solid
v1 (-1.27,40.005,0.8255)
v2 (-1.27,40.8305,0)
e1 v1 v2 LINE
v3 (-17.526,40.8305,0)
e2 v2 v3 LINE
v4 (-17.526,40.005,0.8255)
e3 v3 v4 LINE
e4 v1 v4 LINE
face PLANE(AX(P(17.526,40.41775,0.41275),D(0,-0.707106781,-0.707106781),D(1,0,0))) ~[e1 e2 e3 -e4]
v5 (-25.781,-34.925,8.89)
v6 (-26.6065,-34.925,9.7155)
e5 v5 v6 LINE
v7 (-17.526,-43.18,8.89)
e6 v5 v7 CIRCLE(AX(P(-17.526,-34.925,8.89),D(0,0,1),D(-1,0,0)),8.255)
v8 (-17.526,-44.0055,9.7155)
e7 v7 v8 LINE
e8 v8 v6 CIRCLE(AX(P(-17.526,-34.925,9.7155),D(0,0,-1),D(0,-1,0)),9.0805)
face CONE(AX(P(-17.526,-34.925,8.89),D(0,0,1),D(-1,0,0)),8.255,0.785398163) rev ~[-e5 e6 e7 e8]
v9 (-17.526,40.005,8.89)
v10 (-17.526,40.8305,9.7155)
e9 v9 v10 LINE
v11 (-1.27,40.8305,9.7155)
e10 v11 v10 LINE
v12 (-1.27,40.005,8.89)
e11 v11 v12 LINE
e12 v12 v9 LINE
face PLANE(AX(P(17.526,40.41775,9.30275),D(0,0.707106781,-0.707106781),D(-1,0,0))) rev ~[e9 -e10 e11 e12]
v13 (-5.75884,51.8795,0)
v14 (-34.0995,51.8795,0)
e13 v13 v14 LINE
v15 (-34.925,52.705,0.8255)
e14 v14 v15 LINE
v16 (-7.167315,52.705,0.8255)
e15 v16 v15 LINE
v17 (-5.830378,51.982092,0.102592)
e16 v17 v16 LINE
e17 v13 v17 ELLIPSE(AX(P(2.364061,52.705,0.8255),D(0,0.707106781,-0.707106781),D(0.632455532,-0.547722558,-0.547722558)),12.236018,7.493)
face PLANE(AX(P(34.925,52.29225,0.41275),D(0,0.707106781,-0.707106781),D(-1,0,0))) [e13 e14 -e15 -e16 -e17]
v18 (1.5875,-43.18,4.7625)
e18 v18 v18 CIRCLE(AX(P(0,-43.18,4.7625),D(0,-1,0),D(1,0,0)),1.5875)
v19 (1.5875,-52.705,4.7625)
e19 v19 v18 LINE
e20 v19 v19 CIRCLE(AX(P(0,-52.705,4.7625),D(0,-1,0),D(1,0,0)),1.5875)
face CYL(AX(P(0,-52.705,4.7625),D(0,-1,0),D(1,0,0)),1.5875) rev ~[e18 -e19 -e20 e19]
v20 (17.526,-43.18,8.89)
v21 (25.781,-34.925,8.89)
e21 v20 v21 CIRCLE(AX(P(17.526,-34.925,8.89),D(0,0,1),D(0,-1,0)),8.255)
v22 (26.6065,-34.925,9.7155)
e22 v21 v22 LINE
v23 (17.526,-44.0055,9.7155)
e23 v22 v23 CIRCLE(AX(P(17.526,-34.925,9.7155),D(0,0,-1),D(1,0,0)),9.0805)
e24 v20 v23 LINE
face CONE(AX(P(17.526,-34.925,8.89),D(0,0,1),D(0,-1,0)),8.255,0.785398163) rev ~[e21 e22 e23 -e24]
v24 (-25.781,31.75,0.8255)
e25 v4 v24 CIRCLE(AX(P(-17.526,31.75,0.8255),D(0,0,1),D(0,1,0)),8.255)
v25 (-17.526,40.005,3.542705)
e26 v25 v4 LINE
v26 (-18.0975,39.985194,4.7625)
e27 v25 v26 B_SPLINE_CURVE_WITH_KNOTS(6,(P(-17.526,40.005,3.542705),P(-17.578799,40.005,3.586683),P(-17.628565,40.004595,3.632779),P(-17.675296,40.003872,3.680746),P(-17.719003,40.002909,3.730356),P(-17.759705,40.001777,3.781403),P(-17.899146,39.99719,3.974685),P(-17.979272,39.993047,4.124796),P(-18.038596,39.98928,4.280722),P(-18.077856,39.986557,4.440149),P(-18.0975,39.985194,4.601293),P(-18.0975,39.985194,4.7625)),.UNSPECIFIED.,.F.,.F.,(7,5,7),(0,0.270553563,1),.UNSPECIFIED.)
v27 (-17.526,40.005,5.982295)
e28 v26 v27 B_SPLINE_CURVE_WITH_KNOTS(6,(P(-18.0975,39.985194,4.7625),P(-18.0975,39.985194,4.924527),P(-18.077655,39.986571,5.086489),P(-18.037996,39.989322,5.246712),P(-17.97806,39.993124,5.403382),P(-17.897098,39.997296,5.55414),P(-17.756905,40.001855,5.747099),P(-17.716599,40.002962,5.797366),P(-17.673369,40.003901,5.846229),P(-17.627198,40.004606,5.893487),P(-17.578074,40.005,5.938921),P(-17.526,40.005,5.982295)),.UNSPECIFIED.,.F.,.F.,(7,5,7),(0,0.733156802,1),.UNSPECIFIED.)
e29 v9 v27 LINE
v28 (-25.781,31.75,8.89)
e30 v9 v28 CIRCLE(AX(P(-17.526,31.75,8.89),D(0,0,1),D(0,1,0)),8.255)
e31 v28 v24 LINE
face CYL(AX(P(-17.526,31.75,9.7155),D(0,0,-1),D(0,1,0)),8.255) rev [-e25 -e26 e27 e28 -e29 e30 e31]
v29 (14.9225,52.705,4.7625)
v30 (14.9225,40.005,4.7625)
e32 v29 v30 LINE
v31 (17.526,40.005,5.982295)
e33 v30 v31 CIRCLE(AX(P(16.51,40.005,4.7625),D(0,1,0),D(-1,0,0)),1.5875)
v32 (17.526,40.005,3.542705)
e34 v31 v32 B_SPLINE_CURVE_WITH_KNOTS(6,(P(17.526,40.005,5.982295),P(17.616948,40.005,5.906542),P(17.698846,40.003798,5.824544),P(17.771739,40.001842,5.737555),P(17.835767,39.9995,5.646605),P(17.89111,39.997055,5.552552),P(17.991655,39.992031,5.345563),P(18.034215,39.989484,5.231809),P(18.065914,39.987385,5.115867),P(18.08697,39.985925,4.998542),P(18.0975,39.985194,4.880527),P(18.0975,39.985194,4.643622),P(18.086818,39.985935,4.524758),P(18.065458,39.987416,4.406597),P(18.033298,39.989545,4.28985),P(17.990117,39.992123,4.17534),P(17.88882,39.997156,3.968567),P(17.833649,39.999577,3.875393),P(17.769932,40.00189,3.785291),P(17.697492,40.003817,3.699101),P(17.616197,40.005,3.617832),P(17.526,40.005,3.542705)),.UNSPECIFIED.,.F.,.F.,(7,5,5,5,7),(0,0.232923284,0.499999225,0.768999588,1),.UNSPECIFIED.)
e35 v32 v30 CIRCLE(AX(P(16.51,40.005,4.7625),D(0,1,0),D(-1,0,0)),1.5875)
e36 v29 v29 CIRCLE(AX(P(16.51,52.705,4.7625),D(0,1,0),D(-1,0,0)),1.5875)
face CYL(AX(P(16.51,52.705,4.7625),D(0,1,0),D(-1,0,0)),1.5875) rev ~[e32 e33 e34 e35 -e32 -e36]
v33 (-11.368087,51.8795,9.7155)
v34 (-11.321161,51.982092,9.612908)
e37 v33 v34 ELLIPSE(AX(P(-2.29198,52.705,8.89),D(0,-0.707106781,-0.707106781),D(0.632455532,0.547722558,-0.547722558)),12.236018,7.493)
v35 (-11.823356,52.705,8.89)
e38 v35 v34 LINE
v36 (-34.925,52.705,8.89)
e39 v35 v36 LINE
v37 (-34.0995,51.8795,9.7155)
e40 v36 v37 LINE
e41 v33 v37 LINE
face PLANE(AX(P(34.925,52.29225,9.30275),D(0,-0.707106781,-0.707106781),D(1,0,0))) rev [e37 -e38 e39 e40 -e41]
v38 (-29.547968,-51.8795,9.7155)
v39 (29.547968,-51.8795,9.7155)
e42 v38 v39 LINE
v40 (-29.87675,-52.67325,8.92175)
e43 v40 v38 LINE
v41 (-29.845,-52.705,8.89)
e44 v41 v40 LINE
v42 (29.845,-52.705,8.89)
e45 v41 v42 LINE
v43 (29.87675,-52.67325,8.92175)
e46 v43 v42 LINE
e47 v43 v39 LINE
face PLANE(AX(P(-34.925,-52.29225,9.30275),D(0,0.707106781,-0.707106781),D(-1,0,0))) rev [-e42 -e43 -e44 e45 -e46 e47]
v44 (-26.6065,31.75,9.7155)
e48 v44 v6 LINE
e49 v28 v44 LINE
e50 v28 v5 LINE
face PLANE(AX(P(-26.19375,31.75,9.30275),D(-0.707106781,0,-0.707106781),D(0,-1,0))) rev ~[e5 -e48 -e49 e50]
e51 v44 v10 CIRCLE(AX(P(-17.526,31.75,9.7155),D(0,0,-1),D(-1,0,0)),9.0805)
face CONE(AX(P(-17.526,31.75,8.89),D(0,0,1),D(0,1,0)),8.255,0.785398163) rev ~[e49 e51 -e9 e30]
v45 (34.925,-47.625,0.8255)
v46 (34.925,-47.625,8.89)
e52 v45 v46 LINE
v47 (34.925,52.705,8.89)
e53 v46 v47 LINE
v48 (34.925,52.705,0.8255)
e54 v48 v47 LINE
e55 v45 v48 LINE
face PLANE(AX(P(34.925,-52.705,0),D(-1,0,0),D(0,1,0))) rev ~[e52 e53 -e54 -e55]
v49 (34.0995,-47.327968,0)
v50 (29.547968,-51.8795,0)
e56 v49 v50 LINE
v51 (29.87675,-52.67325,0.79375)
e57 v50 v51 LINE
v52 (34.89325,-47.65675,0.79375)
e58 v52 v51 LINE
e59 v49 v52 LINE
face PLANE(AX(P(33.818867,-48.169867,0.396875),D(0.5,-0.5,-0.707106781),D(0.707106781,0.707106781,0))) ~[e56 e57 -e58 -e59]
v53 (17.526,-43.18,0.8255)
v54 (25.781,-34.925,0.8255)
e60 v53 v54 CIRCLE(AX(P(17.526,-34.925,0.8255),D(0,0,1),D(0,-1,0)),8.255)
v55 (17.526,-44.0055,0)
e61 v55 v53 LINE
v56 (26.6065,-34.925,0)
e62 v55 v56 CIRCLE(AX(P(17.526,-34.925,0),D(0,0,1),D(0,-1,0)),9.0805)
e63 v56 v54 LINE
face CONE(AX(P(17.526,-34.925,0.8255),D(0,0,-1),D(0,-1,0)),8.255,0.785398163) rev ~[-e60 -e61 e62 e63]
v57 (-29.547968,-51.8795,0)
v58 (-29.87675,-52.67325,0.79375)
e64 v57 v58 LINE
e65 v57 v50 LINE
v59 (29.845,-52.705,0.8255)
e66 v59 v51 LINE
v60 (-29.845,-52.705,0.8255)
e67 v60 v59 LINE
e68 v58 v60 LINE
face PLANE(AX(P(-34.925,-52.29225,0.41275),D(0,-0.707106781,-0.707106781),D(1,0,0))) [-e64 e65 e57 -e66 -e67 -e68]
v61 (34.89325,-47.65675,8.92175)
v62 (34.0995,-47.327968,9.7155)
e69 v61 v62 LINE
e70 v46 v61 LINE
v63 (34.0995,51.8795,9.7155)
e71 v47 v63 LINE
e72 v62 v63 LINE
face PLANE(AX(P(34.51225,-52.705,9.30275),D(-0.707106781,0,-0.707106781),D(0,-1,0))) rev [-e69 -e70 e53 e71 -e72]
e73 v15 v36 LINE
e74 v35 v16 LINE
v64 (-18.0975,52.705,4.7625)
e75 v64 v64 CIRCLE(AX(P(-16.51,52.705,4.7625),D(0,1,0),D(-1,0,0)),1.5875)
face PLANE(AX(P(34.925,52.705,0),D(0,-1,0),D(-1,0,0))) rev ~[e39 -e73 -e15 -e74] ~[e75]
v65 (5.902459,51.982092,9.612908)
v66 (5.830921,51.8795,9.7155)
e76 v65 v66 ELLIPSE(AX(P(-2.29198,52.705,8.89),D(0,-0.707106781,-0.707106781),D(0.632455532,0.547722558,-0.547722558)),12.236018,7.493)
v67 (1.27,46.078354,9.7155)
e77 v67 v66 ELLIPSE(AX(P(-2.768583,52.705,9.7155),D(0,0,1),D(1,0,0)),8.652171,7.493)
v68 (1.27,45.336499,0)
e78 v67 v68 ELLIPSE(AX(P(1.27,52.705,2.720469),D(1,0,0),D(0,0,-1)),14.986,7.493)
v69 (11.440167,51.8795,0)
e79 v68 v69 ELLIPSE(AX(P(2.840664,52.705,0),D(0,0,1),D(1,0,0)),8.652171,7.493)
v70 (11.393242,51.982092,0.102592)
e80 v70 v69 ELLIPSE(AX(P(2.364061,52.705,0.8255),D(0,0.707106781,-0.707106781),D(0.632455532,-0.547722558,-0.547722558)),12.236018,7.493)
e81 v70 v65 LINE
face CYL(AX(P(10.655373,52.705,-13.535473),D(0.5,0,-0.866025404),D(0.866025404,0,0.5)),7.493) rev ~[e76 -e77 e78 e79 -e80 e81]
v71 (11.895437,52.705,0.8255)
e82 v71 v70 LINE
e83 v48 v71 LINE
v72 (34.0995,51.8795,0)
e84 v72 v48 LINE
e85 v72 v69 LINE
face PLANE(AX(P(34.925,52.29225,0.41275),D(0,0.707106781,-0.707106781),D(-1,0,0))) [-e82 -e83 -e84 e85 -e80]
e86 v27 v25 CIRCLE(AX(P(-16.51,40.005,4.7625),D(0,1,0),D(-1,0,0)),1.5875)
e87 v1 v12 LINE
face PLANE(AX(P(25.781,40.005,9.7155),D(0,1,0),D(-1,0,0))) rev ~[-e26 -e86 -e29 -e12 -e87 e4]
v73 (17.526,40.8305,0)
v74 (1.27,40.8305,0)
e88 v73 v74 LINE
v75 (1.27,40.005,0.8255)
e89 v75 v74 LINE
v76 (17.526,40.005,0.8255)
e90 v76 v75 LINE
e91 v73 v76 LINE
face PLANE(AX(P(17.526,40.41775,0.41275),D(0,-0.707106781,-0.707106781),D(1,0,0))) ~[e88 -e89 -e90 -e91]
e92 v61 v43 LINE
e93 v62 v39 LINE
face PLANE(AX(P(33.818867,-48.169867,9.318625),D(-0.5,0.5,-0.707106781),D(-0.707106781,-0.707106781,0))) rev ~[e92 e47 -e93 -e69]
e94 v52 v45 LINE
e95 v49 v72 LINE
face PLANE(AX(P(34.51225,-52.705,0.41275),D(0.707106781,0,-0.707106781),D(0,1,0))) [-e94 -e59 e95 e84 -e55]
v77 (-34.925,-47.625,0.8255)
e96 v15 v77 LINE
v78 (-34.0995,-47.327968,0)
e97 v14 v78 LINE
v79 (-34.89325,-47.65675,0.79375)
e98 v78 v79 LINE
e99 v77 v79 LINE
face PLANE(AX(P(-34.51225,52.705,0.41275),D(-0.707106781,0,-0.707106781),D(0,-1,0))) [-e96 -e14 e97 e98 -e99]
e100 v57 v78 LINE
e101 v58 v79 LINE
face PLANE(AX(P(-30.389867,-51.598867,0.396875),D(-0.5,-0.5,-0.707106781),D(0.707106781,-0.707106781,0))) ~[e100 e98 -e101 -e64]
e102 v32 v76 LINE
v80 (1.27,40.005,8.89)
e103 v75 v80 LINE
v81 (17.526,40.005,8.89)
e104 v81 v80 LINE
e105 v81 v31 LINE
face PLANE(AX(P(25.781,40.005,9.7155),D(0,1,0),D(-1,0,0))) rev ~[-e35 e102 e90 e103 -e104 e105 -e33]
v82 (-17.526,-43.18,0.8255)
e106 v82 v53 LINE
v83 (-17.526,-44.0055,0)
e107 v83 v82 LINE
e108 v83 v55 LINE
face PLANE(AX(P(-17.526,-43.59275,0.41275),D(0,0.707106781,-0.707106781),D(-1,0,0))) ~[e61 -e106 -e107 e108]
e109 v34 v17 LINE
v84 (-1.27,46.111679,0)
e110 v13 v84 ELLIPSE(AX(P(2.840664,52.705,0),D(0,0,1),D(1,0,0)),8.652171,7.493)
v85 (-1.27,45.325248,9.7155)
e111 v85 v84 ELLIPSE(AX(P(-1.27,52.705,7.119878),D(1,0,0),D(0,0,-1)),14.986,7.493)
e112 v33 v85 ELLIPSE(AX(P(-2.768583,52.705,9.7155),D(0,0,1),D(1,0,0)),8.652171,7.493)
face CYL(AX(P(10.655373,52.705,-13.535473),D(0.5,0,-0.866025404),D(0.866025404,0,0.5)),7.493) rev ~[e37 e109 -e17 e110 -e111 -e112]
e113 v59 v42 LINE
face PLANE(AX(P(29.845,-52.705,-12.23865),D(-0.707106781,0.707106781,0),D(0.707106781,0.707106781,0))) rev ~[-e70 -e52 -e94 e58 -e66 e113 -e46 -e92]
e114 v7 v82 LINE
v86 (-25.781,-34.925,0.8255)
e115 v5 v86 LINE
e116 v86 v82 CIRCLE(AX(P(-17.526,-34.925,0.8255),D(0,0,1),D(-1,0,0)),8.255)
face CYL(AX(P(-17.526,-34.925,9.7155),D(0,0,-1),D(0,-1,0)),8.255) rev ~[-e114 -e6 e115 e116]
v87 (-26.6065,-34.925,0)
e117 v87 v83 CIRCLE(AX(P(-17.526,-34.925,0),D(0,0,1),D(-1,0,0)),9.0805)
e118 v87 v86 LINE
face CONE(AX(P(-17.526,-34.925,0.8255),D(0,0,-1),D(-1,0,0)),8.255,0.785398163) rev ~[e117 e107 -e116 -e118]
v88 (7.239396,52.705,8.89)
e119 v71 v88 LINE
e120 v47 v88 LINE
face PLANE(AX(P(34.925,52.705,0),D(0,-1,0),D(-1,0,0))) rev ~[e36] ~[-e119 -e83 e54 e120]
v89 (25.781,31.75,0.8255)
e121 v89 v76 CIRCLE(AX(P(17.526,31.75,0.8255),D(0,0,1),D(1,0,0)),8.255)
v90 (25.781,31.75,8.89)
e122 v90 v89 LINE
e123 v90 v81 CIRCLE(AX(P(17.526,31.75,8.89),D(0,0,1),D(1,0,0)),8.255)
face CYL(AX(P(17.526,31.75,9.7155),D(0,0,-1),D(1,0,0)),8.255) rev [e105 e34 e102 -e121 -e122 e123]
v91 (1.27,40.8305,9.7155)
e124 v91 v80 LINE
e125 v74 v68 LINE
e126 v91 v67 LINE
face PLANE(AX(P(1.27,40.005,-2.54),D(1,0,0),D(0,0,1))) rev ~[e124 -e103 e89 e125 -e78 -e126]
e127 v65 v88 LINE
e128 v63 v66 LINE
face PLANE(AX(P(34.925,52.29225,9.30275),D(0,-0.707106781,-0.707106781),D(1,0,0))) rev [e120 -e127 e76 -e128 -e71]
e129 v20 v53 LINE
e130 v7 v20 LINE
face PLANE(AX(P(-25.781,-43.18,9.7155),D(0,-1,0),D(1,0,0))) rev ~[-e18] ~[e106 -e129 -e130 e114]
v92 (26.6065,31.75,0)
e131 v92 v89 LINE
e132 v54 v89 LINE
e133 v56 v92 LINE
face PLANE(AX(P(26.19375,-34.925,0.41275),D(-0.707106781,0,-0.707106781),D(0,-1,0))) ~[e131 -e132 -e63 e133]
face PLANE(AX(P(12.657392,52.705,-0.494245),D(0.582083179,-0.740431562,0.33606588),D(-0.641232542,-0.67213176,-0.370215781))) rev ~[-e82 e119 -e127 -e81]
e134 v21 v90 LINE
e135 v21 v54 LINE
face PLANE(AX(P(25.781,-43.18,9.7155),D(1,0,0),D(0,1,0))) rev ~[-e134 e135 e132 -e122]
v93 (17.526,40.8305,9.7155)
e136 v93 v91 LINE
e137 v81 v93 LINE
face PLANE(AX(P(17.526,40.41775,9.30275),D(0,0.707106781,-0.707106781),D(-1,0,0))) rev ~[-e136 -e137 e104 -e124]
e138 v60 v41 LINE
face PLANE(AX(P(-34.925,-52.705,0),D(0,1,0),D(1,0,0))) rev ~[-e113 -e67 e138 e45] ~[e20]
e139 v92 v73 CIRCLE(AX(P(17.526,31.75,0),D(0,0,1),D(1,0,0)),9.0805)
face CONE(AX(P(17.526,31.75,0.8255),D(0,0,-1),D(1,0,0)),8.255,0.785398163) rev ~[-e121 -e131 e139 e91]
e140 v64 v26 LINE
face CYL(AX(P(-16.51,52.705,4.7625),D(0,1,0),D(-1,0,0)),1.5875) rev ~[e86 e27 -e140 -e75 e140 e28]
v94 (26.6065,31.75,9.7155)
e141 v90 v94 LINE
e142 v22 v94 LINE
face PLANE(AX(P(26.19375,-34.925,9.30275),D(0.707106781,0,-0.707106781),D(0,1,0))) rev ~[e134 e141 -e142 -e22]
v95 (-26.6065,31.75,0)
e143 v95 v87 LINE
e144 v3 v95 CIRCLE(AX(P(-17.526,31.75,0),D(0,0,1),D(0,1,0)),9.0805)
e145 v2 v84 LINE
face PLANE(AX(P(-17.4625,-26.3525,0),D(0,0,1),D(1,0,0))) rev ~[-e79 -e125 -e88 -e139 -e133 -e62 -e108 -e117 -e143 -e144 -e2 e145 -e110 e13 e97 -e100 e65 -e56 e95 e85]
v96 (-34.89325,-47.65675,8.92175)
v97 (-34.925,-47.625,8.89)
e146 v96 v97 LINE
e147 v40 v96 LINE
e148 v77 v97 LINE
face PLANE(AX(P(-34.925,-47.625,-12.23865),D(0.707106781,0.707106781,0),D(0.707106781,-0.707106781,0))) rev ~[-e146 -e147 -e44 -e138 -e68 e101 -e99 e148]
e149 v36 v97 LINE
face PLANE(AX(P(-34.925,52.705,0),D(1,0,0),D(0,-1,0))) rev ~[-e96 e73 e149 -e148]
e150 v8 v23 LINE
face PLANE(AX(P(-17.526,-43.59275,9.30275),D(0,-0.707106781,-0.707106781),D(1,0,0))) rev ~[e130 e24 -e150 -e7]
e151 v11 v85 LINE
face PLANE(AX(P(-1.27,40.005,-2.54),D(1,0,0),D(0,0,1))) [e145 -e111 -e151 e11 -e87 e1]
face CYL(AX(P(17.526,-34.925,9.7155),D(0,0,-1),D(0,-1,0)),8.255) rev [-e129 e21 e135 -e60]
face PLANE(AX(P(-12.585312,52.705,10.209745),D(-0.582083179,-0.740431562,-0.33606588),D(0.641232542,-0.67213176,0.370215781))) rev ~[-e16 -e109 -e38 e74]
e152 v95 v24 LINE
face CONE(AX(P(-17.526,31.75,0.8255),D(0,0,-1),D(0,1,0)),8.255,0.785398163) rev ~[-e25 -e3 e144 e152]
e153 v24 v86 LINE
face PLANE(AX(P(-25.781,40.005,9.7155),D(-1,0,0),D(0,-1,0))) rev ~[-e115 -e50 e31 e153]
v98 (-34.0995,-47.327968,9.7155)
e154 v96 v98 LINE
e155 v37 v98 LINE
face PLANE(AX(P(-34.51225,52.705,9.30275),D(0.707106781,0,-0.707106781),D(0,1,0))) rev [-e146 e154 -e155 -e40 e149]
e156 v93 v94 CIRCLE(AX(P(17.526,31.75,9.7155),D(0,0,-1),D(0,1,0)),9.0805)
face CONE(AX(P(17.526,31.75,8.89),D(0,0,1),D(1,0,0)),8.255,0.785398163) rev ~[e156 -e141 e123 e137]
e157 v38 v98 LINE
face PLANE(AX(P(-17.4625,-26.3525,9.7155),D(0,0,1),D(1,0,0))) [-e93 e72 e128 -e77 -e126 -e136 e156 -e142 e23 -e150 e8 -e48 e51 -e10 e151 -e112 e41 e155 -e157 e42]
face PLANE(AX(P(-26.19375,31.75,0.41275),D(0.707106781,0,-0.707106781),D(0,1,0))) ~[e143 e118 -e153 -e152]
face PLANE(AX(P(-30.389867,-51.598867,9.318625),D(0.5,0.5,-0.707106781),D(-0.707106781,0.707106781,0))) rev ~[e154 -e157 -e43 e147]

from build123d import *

# Parameters (mm, degrees)
F0_W         = 34.925
F0_H         = 52.705
F1_DEPTH     = 9.7155
F2_W         = 25.781
F2_H         = 43.18
F2_H_2       = 40.005
F3_DEPTH     = 25.4
F4_R         = 8.255
F5_SIZE      = 0.8255
F6_R         = 1.5875
F7_DEPTH     = 25.4
F8_T1_DEPTH  = 34.1927991577
F9_SIZE      = 0.79375
F10_R        = 1.5875
F11_DEPTH    = 25.4
F13_R        = 7.493
F14_DEPTH    = 50.8
F15_T1_DEPTH = 13.2391086204
F15_T3_DEPTH = 13.2391086204
F16_W        = 2.54
F16_H        = 15.24
F17_DEPTH    = 25.4


# Not quite as in the source:
# - a fillet or chamfer that OpenCascade refuses, or shapes differently, is made with other operations: its cross-section is extruded or revolved along the edge and cut away or added
# - a feature names something its author has since deleted; it is built from what else it names


with BuildPart() as f1:
    # F0 (on Top) → F1 (new body)
    with BuildSketch(Plane.XY):
        with Locations((-17.4625, -26.3525)):
            Rectangle(F0_W, F0_H)
        with Locations((-17.4625, 26.3525)):
            Rectangle(F0_W, F0_H)
        Polygon((0, 52.705), (0, 0), (0, -52.705), (34.925, -52.705), (34.925, 0), (34.925, 52.705), align=None)
    extrude(amount=F1_DEPTH)

    # F2 (on face) → F3 (cut)
    with BuildSketch(Plane.XY.offset(9.7155)):
        with Locations((-12.8905, -21.59)):
            Rectangle(F2_W, F2_H)
        with Locations((-12.8905, 20.0025)):
            Rectangle(F2_W, F2_H_2)
        with Locations((12.8905, -21.59)):
            Rectangle(F2_W, F2_H)
        with Locations((12.8905, 20.0025)):
            Rectangle(F2_W, F2_H_2)
    extrude(amount=-F3_DEPTH, mode=Mode.SUBTRACT)

    # F4
    f4_edges = [f1.edges().sort_by_distance(p)[0] for p in [
        (-25.781, 40.005, 4.85775),
        (25.781, 40.005, 4.85775),
        (-25.781, -43.18, 4.85775),
        (25.781, -43.18, 4.85775),
    ]]
    fillet(f4_edges, radius=F4_R)

    # F5
    f5_edges = [f1.edges().sort_by_distance(p)[0] for p in [
        (-34.925, 0, 9.7155),
        (-25.781, -1.5875, 9.7155),
        (34.925, 0, 9.7155),
        (0, -52.705, 9.7155),
        (0, 52.705, 9.7155),
        (-34.925, 0, 0),
        (0, -52.705, 0),
        (34.925, 0, 0),
        (25.781, -1.5875, 0),
        (0, 52.705, 0),
        (-25.781, -1.5875, 0),
        (-23.363166, 37.587166, 0),
        (-23.363166, -40.762166, 0),
        (0, 40.005, 0),
        (0, -43.18, 0),
        (23.363166, 37.587166, 0),
        (23.363166, -40.762166, 0),
        (-23.363166, 37.587166, 9.7155),
        (-23.363166, -40.762166, 9.7155),
        (0, 40.005, 9.7155),
        (0, -43.18, 9.7155),
        (23.363166, 37.587166, 9.7155),
        (23.363166, -40.762166, 9.7155),
        (25.781, -1.5875, 9.7155),
    ]]
    chamfer(f5_edges, length=F5_SIZE)

    # F6 (on face) → F7 (cut)
    with BuildSketch(Plane(origin=(0, 52.705, 0), x_dir=(-1, 0, 0), z_dir=(0, 1, 0))):
        with Locations((-16.51, 4.7625)):
            Circle(F6_R)
        with Locations((16.51, 4.7625)):
            Circle(F6_R)
    extrude(amount=-F7_DEPTH, mode=Mode.SUBTRACT)

    # F8: chamfer of 5.08 on 2 edges, made by hand

    # F8_s2 → F8_t1 (cut)
    with BuildSketch(Plane.XY.offset(-12.2386495789)):
        Polygon((-34.925, -47.625), (-29.845, -52.705), (-34.925, -52.705), align=None)
        Polygon((29.845, -52.705), (34.925, -47.625), (34.925, -52.705), align=None)
    extrude(amount=F8_T1_DEPTH, mode=Mode.SUBTRACT)

    # F9
    f9_edges = [f1.edges().sort_by_distance(p)[0] for p in [
        (-32.385, -50.165, 0),
        (32.385, -50.165, 0),
        (32.385, -50.165, 9.7155),
        (-32.385, -50.165, 9.7155),
    ]]
    chamfer(f9_edges, length=F9_SIZE)

    # F10 (on face) → F11 (cut)
    with BuildSketch(Plane.XZ.offset(52.705)):
        with Locations((0, 4.7625)):
            Circle(F10_R)
    extrude(amount=-F11_DEPTH, mode=Mode.SUBTRACT)

    # F13 (on face) + F2 (on face) → F14 (cut)
    with BuildSketch(Plane(origin=(8.524875, 0, -14.7655166282), x_dir=(0.8660254038, 0, 0.5), z_dir=(0.5, 0, -0.8660254038))):
        with Locations((2.460086914, -52.705)):
            Circle(F13_R)
    with BuildSketch(Plane.XY.offset(9.7155)):
        with Locations((-12.8905, -21.59)):
            Rectangle(F2_W, F2_H)
        with Locations((-12.8905, 20.0025)):
            Rectangle(F2_W, F2_H_2)
        with Locations((12.8905, -21.59)):
            Rectangle(F2_W, F2_H)
        with Locations((12.8905, 20.0025)):
            Rectangle(F2_W, F2_H_2)
    extrude(amount=-F14_DEPTH, dir=(0.5, 0, -0.8660254038), mode=Mode.SUBTRACT)

    # F15: chamfer of 0.8001 on 2 edges, made by hand

    # F15_s2 → F15_t1 (cut)
    with BuildSketch(Plane(origin=(3.3783625895, 0, -5.8514956514), x_dir=(0, 1, 0), z_dir=(-0.5, 0, 0.8660254038))):
        with BuildLine():
            Line((52.705, -10.7145007393), (51.9820918836, -9.9181330962))
            ThreePointArc((51.9820918836, -9.9181330962), (52.3317918419, -9.9437868459), (52.705, -9.953086914))
            Line((52.705, -9.953086914), (52.705, -10.7145007393))
        make_face()
    extrude(amount=F15_T1_DEPTH, mode=Mode.SUBTRACT)

    # F15_s4 → F15_t3 (cut)
    with BuildSketch(Plane(origin=(-7.5672772878, 0, 13.1069087374), x_dir=(0, 1, 0), z_dir=(0.5, 0, -0.8660254038))):
        with BuildLine():
            Line((52.705, -5.7943269113), (51.9820918836, -4.9979592682))
            ThreePointArc((51.9820918836, -4.9979592682), (52.3317918419, -5.0236130179), (52.705, -5.032913086))
            Line((52.705, -5.032913086), (52.705, -5.7943269113))
        make_face()
    extrude(amount=F15_T3_DEPTH, mode=Mode.SUBTRACT)

    # F16 (on face) → F17 (cut)
    with BuildSketch(Plane.XZ.offset(-40.005)):
        with Locations((0, 5.08)):
            Rectangle(F16_W, F16_H)
    extrude(amount=-F17_DEPTH, mode=Mode.SUBTRACT)


solid = f1.part
